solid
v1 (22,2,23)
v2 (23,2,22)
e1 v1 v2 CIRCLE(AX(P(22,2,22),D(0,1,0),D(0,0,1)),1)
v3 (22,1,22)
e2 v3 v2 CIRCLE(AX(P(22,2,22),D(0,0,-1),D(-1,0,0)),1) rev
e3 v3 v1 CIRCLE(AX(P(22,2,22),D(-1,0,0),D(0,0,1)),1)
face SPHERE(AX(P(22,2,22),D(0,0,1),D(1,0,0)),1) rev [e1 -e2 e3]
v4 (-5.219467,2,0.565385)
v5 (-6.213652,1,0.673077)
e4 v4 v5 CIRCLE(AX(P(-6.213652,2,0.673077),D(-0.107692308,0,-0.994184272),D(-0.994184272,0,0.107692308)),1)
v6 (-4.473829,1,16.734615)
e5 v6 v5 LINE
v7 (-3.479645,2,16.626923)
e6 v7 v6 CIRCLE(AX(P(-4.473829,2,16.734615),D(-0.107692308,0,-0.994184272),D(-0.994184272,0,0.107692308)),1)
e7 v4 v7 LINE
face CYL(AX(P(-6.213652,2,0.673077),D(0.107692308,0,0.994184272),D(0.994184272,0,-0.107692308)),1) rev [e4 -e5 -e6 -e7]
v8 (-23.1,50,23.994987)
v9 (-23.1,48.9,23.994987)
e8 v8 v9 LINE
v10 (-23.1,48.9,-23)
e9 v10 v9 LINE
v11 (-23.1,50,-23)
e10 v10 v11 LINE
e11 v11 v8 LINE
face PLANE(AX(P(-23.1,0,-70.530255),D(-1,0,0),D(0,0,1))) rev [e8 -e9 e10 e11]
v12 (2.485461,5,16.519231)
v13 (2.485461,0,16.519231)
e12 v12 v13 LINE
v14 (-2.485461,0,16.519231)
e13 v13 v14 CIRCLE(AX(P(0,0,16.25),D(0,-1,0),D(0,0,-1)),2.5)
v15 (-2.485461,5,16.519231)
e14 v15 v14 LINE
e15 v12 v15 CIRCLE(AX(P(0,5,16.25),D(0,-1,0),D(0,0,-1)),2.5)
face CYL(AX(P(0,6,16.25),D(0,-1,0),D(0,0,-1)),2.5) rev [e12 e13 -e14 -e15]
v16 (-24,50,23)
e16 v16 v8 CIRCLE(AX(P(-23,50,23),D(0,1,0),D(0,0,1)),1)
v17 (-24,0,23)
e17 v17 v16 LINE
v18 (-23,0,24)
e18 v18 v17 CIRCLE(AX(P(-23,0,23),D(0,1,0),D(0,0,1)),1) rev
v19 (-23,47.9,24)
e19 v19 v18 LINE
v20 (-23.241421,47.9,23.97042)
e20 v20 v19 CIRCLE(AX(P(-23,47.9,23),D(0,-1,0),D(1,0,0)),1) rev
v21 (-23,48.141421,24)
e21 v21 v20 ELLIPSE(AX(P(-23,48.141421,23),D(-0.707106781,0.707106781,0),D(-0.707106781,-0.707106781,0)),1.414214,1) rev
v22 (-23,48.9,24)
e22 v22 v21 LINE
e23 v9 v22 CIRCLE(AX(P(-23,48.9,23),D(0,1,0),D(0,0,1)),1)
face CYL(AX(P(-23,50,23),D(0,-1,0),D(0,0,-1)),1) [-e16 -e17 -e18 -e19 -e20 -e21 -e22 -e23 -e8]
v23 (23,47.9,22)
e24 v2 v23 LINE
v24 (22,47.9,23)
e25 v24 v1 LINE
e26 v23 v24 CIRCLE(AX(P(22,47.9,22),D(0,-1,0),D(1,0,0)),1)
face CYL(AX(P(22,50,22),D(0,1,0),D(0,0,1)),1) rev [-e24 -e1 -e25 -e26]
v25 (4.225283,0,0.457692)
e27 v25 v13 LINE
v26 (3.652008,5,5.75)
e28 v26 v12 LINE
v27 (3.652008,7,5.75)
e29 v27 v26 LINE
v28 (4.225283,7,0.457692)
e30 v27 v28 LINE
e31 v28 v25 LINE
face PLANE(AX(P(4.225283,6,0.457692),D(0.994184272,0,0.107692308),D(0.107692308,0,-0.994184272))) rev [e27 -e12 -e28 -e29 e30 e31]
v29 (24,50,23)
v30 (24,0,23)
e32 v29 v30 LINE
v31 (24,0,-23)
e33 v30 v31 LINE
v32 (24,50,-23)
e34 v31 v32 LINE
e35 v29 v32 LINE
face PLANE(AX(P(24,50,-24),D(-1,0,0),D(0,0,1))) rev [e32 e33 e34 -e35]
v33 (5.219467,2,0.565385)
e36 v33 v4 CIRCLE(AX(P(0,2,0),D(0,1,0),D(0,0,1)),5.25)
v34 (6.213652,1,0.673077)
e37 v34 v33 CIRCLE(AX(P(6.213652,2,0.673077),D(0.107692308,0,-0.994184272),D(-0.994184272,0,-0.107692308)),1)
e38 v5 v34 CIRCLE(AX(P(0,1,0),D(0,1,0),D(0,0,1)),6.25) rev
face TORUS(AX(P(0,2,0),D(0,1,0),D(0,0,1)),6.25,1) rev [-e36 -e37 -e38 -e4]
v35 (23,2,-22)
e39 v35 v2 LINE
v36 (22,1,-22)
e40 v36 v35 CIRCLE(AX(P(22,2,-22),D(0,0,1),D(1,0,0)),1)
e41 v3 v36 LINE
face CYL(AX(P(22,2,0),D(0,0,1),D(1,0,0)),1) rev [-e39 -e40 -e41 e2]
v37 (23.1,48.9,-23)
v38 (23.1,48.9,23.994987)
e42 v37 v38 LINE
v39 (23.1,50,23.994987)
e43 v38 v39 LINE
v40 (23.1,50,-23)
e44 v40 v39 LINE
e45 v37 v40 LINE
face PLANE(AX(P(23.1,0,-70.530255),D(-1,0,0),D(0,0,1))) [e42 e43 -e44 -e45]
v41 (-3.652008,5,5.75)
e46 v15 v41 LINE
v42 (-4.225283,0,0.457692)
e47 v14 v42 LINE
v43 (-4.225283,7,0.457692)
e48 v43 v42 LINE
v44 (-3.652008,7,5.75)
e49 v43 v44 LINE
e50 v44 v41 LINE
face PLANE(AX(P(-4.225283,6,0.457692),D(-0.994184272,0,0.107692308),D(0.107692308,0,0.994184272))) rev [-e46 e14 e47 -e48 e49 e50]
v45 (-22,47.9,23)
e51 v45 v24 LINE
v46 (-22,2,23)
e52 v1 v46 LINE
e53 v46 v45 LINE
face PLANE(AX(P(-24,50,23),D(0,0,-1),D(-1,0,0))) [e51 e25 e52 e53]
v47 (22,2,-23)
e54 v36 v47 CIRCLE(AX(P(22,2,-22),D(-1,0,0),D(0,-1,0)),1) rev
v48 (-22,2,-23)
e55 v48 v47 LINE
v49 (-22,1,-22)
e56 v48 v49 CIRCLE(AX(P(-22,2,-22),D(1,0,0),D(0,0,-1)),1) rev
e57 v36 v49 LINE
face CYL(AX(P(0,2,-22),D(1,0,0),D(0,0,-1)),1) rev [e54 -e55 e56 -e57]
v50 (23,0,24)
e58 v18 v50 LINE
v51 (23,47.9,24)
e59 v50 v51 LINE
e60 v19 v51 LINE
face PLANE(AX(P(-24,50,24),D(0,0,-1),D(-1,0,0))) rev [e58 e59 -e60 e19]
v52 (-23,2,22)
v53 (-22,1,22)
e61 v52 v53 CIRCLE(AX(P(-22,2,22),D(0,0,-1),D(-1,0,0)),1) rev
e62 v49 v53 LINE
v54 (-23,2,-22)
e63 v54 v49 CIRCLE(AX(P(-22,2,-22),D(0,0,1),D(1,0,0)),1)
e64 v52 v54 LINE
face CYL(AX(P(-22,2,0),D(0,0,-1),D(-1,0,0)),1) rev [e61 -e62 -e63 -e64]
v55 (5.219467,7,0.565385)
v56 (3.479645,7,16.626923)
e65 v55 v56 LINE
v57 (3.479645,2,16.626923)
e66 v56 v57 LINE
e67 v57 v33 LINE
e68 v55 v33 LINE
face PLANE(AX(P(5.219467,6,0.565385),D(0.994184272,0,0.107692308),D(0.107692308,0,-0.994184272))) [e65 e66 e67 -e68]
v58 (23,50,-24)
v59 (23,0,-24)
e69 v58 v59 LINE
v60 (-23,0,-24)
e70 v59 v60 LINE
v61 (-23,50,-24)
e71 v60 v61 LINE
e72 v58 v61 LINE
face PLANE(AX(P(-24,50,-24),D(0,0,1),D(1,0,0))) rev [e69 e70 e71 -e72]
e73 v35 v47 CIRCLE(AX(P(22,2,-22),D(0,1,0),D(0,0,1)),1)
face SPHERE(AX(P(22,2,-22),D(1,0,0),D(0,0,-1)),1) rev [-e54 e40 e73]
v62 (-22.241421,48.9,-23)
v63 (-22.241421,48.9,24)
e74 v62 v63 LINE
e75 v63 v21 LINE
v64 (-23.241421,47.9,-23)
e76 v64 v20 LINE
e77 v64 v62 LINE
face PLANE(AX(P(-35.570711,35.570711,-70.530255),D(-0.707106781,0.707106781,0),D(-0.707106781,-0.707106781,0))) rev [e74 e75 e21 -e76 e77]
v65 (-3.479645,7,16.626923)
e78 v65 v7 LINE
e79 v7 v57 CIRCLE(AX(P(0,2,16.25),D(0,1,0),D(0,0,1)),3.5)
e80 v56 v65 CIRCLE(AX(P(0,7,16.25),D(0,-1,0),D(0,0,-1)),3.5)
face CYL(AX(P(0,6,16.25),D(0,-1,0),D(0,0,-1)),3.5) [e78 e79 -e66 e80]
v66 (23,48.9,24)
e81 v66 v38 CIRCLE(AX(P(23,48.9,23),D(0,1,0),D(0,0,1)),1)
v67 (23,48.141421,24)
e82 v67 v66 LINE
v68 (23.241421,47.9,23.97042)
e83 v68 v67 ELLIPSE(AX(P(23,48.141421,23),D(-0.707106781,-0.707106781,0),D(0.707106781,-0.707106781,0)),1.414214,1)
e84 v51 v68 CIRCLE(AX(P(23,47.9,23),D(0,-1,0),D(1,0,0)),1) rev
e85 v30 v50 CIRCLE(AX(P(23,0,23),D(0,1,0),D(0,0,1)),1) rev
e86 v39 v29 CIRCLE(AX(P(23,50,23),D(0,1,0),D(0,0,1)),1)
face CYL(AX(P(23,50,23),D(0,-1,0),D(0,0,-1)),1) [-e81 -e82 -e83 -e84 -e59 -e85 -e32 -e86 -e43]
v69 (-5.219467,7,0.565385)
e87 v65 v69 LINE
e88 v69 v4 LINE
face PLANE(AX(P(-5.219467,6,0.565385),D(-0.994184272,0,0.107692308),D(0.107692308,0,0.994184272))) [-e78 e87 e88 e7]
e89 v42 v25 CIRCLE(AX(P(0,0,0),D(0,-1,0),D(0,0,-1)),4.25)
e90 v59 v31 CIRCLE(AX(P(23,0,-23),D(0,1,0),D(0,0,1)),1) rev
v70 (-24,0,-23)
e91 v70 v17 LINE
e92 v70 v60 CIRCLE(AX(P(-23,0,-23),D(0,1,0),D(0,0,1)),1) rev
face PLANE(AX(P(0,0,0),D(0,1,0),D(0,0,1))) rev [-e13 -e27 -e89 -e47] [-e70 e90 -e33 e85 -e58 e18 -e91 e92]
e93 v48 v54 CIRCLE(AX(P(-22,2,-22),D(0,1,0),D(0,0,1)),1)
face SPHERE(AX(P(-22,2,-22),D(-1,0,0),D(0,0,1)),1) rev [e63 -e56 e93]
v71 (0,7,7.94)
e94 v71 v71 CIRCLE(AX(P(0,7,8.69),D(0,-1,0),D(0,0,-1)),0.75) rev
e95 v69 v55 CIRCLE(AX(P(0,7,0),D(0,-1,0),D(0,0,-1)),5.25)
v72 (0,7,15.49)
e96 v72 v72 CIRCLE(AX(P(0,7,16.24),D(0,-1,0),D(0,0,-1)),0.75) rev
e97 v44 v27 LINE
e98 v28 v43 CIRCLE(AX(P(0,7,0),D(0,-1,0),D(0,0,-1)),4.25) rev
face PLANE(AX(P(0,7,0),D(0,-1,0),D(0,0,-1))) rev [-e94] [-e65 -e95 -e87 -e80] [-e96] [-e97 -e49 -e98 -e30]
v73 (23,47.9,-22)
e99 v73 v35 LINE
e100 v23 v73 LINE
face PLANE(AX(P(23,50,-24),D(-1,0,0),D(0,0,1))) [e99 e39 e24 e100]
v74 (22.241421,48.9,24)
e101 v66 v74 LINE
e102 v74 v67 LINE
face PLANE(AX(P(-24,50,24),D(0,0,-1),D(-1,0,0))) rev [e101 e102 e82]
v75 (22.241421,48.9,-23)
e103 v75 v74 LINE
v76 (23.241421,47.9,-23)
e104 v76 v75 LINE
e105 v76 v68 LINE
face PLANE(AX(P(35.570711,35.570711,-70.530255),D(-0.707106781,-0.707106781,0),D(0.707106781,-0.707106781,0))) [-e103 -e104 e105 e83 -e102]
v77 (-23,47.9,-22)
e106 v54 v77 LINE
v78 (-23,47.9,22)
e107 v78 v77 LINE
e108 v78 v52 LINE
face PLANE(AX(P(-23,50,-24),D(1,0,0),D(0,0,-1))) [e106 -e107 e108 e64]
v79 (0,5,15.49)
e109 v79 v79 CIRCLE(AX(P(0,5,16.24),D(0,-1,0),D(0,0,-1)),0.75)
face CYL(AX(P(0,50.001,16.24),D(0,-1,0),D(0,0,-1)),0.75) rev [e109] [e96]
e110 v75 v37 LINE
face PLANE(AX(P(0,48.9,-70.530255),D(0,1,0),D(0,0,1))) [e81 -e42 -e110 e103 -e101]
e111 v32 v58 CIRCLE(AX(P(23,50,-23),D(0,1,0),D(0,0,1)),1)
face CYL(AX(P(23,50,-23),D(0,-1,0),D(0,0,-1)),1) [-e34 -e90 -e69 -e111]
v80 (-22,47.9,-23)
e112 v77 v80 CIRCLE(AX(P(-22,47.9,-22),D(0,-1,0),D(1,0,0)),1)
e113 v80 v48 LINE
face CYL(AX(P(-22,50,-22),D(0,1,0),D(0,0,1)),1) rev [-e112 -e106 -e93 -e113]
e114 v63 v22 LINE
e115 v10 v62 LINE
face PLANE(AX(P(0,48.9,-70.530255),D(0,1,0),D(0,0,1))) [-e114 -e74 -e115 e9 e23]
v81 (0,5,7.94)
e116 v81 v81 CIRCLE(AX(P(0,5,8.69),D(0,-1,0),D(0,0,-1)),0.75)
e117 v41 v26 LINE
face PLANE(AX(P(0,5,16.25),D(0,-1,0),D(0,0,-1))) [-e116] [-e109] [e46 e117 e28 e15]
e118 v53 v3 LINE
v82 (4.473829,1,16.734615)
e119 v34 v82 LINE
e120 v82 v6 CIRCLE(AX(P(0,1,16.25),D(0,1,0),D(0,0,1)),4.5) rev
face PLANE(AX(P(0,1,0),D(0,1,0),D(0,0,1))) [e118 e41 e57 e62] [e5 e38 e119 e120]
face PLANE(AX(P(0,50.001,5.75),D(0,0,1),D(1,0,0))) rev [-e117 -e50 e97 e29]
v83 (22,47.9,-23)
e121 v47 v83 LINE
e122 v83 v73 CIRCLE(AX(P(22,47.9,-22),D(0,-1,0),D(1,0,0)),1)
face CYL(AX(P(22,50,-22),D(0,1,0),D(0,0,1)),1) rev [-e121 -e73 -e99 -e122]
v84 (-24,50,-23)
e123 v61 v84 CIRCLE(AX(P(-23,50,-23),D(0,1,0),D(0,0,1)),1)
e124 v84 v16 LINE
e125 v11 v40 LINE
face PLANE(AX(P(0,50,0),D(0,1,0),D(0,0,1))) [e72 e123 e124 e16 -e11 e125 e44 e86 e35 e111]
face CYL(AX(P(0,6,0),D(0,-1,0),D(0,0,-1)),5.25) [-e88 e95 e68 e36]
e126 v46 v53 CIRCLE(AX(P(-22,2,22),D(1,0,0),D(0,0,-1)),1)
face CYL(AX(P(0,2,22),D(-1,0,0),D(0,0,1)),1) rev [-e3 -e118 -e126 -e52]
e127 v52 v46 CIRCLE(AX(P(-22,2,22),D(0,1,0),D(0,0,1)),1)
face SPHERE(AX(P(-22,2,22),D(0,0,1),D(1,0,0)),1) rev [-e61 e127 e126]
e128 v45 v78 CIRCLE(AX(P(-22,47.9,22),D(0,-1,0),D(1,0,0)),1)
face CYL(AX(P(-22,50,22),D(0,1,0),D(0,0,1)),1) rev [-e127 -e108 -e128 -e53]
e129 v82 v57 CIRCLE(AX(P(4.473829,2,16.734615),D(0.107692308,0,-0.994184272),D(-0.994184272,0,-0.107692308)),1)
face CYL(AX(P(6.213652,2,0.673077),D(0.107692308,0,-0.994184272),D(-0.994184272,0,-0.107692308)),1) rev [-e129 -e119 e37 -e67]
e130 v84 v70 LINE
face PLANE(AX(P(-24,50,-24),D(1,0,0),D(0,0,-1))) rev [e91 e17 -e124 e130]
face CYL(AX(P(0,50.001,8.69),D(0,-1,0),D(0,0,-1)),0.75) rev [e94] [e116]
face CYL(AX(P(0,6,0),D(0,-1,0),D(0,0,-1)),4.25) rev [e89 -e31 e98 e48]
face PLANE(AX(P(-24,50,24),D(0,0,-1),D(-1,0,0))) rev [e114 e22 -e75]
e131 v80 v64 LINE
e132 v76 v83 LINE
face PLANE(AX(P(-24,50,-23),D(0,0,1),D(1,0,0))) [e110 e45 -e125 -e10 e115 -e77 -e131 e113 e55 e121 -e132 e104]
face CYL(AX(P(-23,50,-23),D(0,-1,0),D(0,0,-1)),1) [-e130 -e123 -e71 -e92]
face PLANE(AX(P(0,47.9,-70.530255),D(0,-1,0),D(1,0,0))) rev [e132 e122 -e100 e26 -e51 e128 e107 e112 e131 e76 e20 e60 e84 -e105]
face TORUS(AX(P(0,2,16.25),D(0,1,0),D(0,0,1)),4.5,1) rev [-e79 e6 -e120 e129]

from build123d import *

# Parameters (mm, degrees)
EXTRUDE_1_DEPTH     = 50
CUT_EXTRUDE_1_DEPTH = 47
CUT_EXTRUDE_3_DEPTH = 6
SHELL_START         = 1
SHELL_1_OUTLINE_W   = 46
SHELL_1_OUTLINE_H   = 46
SHELL_1_DEPTH       = 46.9
SHELL_START_2       = 7
SHELL_1_2_DEPTH     = 40.9
CUT_EXTRUDE_4_REACH = 57.57
FILLET_2_R          = 1
EXTRUDE_START       = 1
SKETCH_10_R         = 0.7500000000000009
EXTRUDE_3_DEPTH     = 1


# Read off the part's stored shape, not the designer's step: 抽壳1
with BuildPart() as part:
    # 草图1 → 凸台-拉伸1 (new body)
    with BuildSketch(Plane(origin=(0, 0, 0), x_dir=(1, 0, 0), z_dir=(0, 1, 0))):
        Polygon((-24.000000000000007, 24.000000000000004), (23.999999999999993, 24.000000000000004), (24.000000000000004, -24), (-23.999999999999996, -24), align=None)
    extrude(amount=EXTRUDE_1_DEPTH)

    # 草图2 → 切除-拉伸1 (cut)
    with BuildSketch(Plane.XY.offset(24)):
        Polygon((23.1, 50), (23.000000000000004, 50), (23.000000000000004, 49.00000000000004), (22.000000000000007, 49.00000000000005), (23.000000000000004, 48.000000000000036), (22.000000000000117, 47.99999999999991), (21.000000000000004, 49.00000000000004), (-20.99999999999999, 49.00000000000003), (-21.99999999999998, 48.00000000000006), (-22.999999999999975, 48.00000000000005), (-21.999999999999996, 49.000000000000036), (-22.999999999999996, 49.000000000000036), (-22.999999999999996, 50), (-23.09999999999999, 50), (-23.099999999999994, 48.900000000000034), (-22.241421356237293, 48.900000000000034), (-23.24142135623728, 47.900000000000055), (-21.958578643762664, 47.90000000000006), (-20.95857864376269, 48.900000000000034), (20.9585786437627, 48.90000000000004), (21.95857864376282, 47.8999999999999), (23.241421356237286, 47.90000000000006), (22.24142135623732, 48.90000000000004), (23.1, 48.90000000000004), align=None)
        Polygon((23.000000000000004, 49.00000000000004), (23.000000000000004, 50), (-22.999999999999996, 50), (-22.999999999999996, 49.000000000000036), (-21.999999999999996, 49.000000000000036), (-22.999999999999975, 48.00000000000005), (-21.99999999999998, 48.00000000000006), (-20.99999999999999, 49.00000000000003), (21.000000000000004, 49.00000000000004), (22.000000000000117, 47.99999999999991), (23.000000000000004, 48.000000000000036), (22.000000000000007, 49.00000000000005), align=None)
        Polygon((-20.95857864376269, 48.900000000000034), (-21.958578643762664, 47.90000000000006), (21.95857864376282, 47.8999999999999), (20.9585786437627, 48.90000000000004), align=None)
    extrude(amount=-CUT_EXTRUDE_1_DEPTH, mode=Mode.SUBTRACT)

    # 草图6 → 切除-拉伸3 (cut)
    with BuildSketch(Plane.XZ):
        with BuildLine():
            Line((4.225283156367072, 0.45769230769231345), (2.485460680215815, 16.519230769230756))
            ThreePointArc((2.485460680215815, 16.519230769230756), (-1.2012e-13, 18.75), (-2.485460680216046, 16.51923076923075))
            Line((-2.485460680216046, 16.51923076923075), (-4.225283156367078, 0.4576923076922684))
            ThreePointArc((-4.225283156367078, 0.4576923076922684), (2.187e-14, -4.250000000000001), (4.225283156367072, 0.45769230769231345))
        make_face()
    extrude(amount=-CUT_EXTRUDE_3_DEPTH, mode=Mode.SUBTRACT)

    # 抽壳1 outline → 抽壳1 (cut)
    with BuildSketch(Plane(origin=(0, 0, 0), x_dir=(1, 0, 0), z_dir=(0, 1, 0)).offset(SHELL_START)):
        Rectangle(SHELL_1_OUTLINE_W, SHELL_1_OUTLINE_H)
        with BuildLine():
            Line((-3.479644952, -16.626923077), (-5.219467428, -0.565384615))
            ThreePointArc((-5.219467428, -0.565384615), (0, 5.25), (5.219467428, -0.565384615))
            Line((5.219467428, -0.565384615), (3.479644952, -16.626923077))
            ThreePointArc((3.479644952, -16.626923077), (0, -19.75), (-3.479644952, -16.626923077))
        make_face(mode=Mode.SUBTRACT)
    extrude(amount=SHELL_1_DEPTH, mode=Mode.SUBTRACT)

    # Shell 1 2 outline → Shell 1 2 (cut)
    with BuildSketch(Plane(origin=(0, 0, 0), x_dir=(1, 0, 0), z_dir=(0, 1, 0)).offset(SHELL_START_2)):
        with BuildLine():
            ThreePointArc((5.219467428, -0.565384615), (0, 5.25), (-5.219467428, -0.565384615))
            Line((-5.219467428, -0.565384615), (-3.479644952, -16.626923077))
            ThreePointArc((-3.479644952, -16.626923077), (0, -19.75), (3.479644952, -16.626923077))
            Line((3.479644952, -16.626923077), (5.219467428, -0.565384615))
        make_face()
    extrude(amount=SHELL_1_2_DEPTH, mode=Mode.SUBTRACT)

    # 草图7 → 切除-拉伸4 (cut, up to next)
    with BuildSketch(Plane.XZ.offset(-6), mode=Mode.PRIVATE) as cut_extrude_4_sk1:
        with BuildLine():
            ThreePointArc((1.0553e-13, -4.25), (3.1628857320248525, -2.8387768221812744), (4.225283156367072, 0.45769230769231267))
            Line((4.225283156367072, 0.45769230769231345), (3.6520083174819797, 5.75000000000003))
            Line((3.6520083174819793, 5.750000000000031), (-3.997e-14, 5.750000000000005))
            Line((-4.015e-14, 5.750000000000007), (2.968e-14, -4.25))
        make_face()
    cut_extrude_4_tool1 = extrude(cut_extrude_4_sk1.sketch, amount=-CUT_EXTRUDE_4_REACH, mode=Mode.PRIVATE) & part.part
    # 草图7 → 切除-拉伸4 (cut, up to next)
    with BuildSketch(Plane.XZ.offset(-6), mode=Mode.PRIVATE) as cut_extrude_4_sk2:
        with BuildLine():
            ThreePointArc((-4.225283156367077, 0.4576923076922684), (-3.162885732024767, -2.8387768221813694), (1.0553e-13, -4.25))
            Line((2.968e-14, -4.25), (-4.015e-14, 5.750000000000007))
            Line((-3.997e-14, 5.750000000000005), (-3.6520083174820606, 5.74999999999998))
            Line((-3.6520083174820623, 5.7499999999999805), (-4.225283156367078, 0.45769230769226965))
        make_face()
    cut_extrude_4_tool2 = extrude(cut_extrude_4_sk2.sketch, amount=-CUT_EXTRUDE_4_REACH, mode=Mode.PRIVATE) & part.part
    # 草图7 → 切除-拉伸4 (cut, up to next)
    with BuildSketch(Plane.XZ.offset(-6), mode=Mode.PRIVATE) as cut_extrude_4_sk3:
        with BuildLine():
            ThreePointArc((-7.866e-14, 9.439999999999992), (-0.7500000000000644, 8.689999999999989), (-7.185e-14, 7.9399999999999915))
            Line((-5.544e-14, 7.939999999999991), (-6.592e-14, 9.43999999999999))
        make_face()
    cut_extrude_4_tool3 = extrude(cut_extrude_4_sk3.sketch, amount=-CUT_EXTRUDE_4_REACH, mode=Mode.PRIVATE) & part.part
    # 草图7 → 切除-拉伸4 (cut, up to next)
    with BuildSketch(Plane.XZ.offset(-6), mode=Mode.PRIVATE) as cut_extrude_4_sk4:
        with BuildLine():
            Line((-6.592e-14, 9.43999999999999), (-5.544e-14, 7.939999999999991))
            ThreePointArc((-7.185e-14, 7.9399999999999915), (0.5303300858898444, 8.15966991411008), (0.7499999999999369, 8.689999999999992))
            ThreePointArc((0.7499999999999369, 8.689999999999992), (0.5303300858898421, 9.220330085889909), (-7.866e-14, 9.439999999999992))
        make_face()
    cut_extrude_4_tool4 = extrude(cut_extrude_4_sk4.sketch, amount=-CUT_EXTRUDE_4_REACH, mode=Mode.PRIVATE) & part.part
    # 草图7 → 切除-拉伸4 (cut, up to next)
    with BuildSketch(Plane.XZ.offset(-6), mode=Mode.PRIVATE) as cut_extrude_4_sk5:
        with BuildLine():
            ThreePointArc((-7.866e-14, 9.439999999999992), (-0.7500000000000644, 8.689999999999989), (-7.185e-14, 7.9399999999999915))
            Line((-5.544e-14, 7.939999999999991), (-6.592e-14, 9.43999999999999))
        make_face()
    cut_extrude_4_tool5 = extrude(cut_extrude_4_sk5.sketch, amount=-CUT_EXTRUDE_4_REACH, mode=Mode.PRIVATE) & part.part
    # 草图7 → 切除-拉伸4 (cut, up to next)
    with BuildSketch(Plane.XZ.offset(-6), mode=Mode.PRIVATE) as cut_extrude_4_sk6:
        with BuildLine():
            Line((-6.592e-14, 9.43999999999999), (-5.544e-14, 7.939999999999991))
            ThreePointArc((-7.185e-14, 7.9399999999999915), (0.5303300858898444, 8.15966991411008), (0.7499999999999369, 8.689999999999992))
            ThreePointArc((0.7499999999999369, 8.689999999999992), (0.5303300858898421, 9.220330085889909), (-7.866e-14, 9.439999999999992))
        make_face()
    cut_extrude_4_tool6 = extrude(cut_extrude_4_sk6.sketch, amount=-CUT_EXTRUDE_4_REACH, mode=Mode.PRIVATE) & part.part
    # 草图7 → 切除-拉伸4 (cut, up to next)
    with BuildSketch(Plane.XZ.offset(-6), mode=Mode.PRIVATE) as cut_extrude_4_sk7:
        with BuildLine():
            ThreePointArc((0.7499999999998826, 16.24), (0.5303300858897884, 16.770330085889913), (-1.3142e-13, 16.99))
            Line((-1.1864e-13, 16.989999999999995), (-1.0817e-13, 15.489999999999998))
            ThreePointArc((-1.2411e-13, 15.489999999999998), (0.5303300858897908, 15.709669914110085), (0.7499999999998826, 16.24))
        make_face()
    cut_extrude_4_tool7 = extrude(cut_extrude_4_sk7.sketch, amount=-CUT_EXTRUDE_4_REACH, mode=Mode.PRIVATE) & part.part
    # 草图7 → 切除-拉伸4 (cut, up to next)
    with BuildSketch(Plane.XZ.offset(-6), mode=Mode.PRIVATE) as cut_extrude_4_sk8:
        with BuildLine():
            Line((-1.0817e-13, 15.489999999999998), (-1.1864e-13, 16.989999999999995))
            ThreePointArc((-1.3142e-13, 16.99), (-0.7500000000001174, 16.239999999999995), (-1.2344e-13, 15.489999999999998))
        make_face()
    cut_extrude_4_tool8 = extrude(cut_extrude_4_sk8.sketch, amount=-CUT_EXTRUDE_4_REACH, mode=Mode.PRIVATE) & part.part
    # 草图7 → 切除-拉伸4 (cut, up to next)
    with BuildSketch(Plane.XZ.offset(-6), mode=Mode.PRIVATE) as cut_extrude_4_sk9:
        with BuildLine():
            ThreePointArc((0.7499999999998826, 16.24), (0.5303300858897884, 16.770330085889913), (-1.3142e-13, 16.99))
            Line((-1.1864e-13, 16.989999999999995), (-1.0817e-13, 15.489999999999998))
            ThreePointArc((-1.2411e-13, 15.489999999999998), (0.5303300858897908, 15.709669914110085), (0.7499999999998826, 16.24))
        make_face()
    cut_extrude_4_tool9 = extrude(cut_extrude_4_sk9.sketch, amount=-CUT_EXTRUDE_4_REACH, mode=Mode.PRIVATE) & part.part
    # 草图7 → 切除-拉伸4 (cut, up to next)
    with BuildSketch(Plane.XZ.offset(-6), mode=Mode.PRIVATE) as cut_extrude_4_sk10:
        with BuildLine():
            Line((-1.0817e-13, 15.489999999999998), (-1.1864e-13, 16.989999999999995))
            ThreePointArc((-1.3142e-13, 16.99), (-0.7500000000001174, 16.239999999999995), (-1.2344e-13, 15.489999999999998))
        make_face()
    cut_extrude_4_tool10 = extrude(cut_extrude_4_sk10.sketch, amount=-CUT_EXTRUDE_4_REACH, mode=Mode.PRIVATE) & part.part
    add(cut_extrude_4_tool1.solids().sort_by_distance((1.915714, 6, 1.033627))[0], mode=Mode.SUBTRACT)
    add(cut_extrude_4_tool2.solids().sort_by_distance((-1.915714, 6, 1.033627))[0], mode=Mode.SUBTRACT)
    add(cut_extrude_4_tool3.solids().sort_by_distance((-0.31831, 6, 8.69))[0], mode=Mode.SUBTRACT)
    add(cut_extrude_4_tool4.solids().sort_by_distance((0.31831, 6, 8.69))[0], mode=Mode.SUBTRACT)
    add(cut_extrude_4_tool5.solids().sort_by_distance((-0.31831, 6, 8.69))[0], mode=Mode.SUBTRACT)
    add(cut_extrude_4_tool6.solids().sort_by_distance((0.31831, 6, 8.69))[0], mode=Mode.SUBTRACT)
    add(cut_extrude_4_tool7.solids().sort_by_distance((0.31831, 6, 16.24))[0], mode=Mode.SUBTRACT)
    add(cut_extrude_4_tool8.solids().sort_by_distance((-0.31831, 6, 16.24))[0], mode=Mode.SUBTRACT)
    add(cut_extrude_4_tool9.solids().sort_by_distance((0.31831, 6, 16.24))[0], mode=Mode.SUBTRACT)
    add(cut_extrude_4_tool10.solids().sort_by_distance((-0.31831, 6, 16.24))[0], mode=Mode.SUBTRACT)

    # 圆角2
    # the kernel refuses this fillet: 1 mm, written as the material it adds along each edge
    with BuildSketch(Plane(origin=(22, 2, -22), x_dir=(0, -1, 0), z_dir=(1, 0, 0))) as fillet_2_piece_1_section:
        Polygon((0, 0), (FILLET_2_R, 0), (FILLET_2_R, FILLET_2_R), (0, FILLET_2_R), align=None)
    fillet_2_piece_1 = extrude(amount=FILLET_2_R, mode=Mode.PRIVATE)
    fillet_2_piece_1 = fillet_2_piece_1 - Plane(origin=(22, 2, -22), x_dir=(0, 0.7071067811865475, 0.7071067811865475), z_dir=(1, 0, 0)) * Sphere(FILLET_2_R, mode=Mode.PRIVATE)
    add(fillet_2_piece_1)
    with BuildSketch(Plane(origin=(-22, 2, -22), x_dir=(0, -1, 0), z_dir=(-1, 0, 0))) as fillet_2_piece_2_section:
        Polygon((0, 0), (FILLET_2_R, 0), (FILLET_2_R, -FILLET_2_R), (0, -FILLET_2_R), align=None)
    fillet_2_piece_2 = extrude(amount=FILLET_2_R, mode=Mode.PRIVATE)
    fillet_2_piece_2 = fillet_2_piece_2 - Plane(origin=(-22, 2, -22), x_dir=(0, 0.7071067811865475, 0.7071067811865475), z_dir=(-1, 0, 0)) * Sphere(FILLET_2_R, mode=Mode.PRIVATE)
    add(fillet_2_piece_2)
    with BuildSketch(Plane(origin=(22, 2, 22), x_dir=(0, -1, 0), z_dir=(1, 0, 0))) as fillet_2_piece_3_section:
        Polygon((0, 0), (FILLET_2_R, 0), (FILLET_2_R, -FILLET_2_R), (0, -FILLET_2_R), align=None)
    fillet_2_piece_3 = extrude(amount=FILLET_2_R, mode=Mode.PRIVATE)
    fillet_2_piece_3 = fillet_2_piece_3 - Plane(origin=(22, 2, 22), x_dir=(0, 0.7071067811865475, -0.7071067811865475), z_dir=(1, 0, 0)) * Sphere(FILLET_2_R, mode=Mode.PRIVATE)
    add(fillet_2_piece_3)
    with BuildSketch(Plane(origin=(-22, 2, 22), x_dir=(0, -1, 0), z_dir=(-1, 0, 0))) as fillet_2_piece_4_section:
        Polygon((0, 0), (FILLET_2_R, 0), (FILLET_2_R, FILLET_2_R), (0, FILLET_2_R), align=None)
    fillet_2_piece_4 = extrude(amount=FILLET_2_R, mode=Mode.PRIVATE)
    fillet_2_piece_4 = fillet_2_piece_4 - Plane(origin=(-22, 2, 22), x_dir=(0, 0.7071067811865475, -0.7071067811865475), z_dir=(-1, 0, 0)) * Sphere(FILLET_2_R, mode=Mode.PRIVATE)
    add(fillet_2_piece_4)
    with BuildSketch(Plane(origin=(-1.1e-16, 1, 16.250000000327525), x_dir=(0.9941842720930342, 0, 0.1076923076307851), z_dir=(0.1076923076307851, 0, -0.9941842720930342))) as fillet_2_piece_5:
        with BuildLine():
            CenterArc((3.4999999996724753 + FILLET_2_R, -FILLET_2_R), FILLET_2_R, 90, 90)
            Line((3.4999999996724753, -FILLET_2_R), (3.4999999996724753, 0))
            Line((3.4999999996724753, 0), (3.4999999996724753 + FILLET_2_R, 0))
        make_face()
    revolve(axis=Axis((-1.1e-16, 1, 16.250000000327525), (0, -1, 0)), revolution_arc=167.63539153430426)
    with BuildSketch(Plane(origin=(5.219467428, 1, 0.565384615), x_dir=(0.994184272087703, 0, 0.10769230768000165), z_dir=(-0.10769230768000165, 0, 0.994184272087703))) as fillet_2_piece_6:
        with BuildLine():
            CenterArc((FILLET_2_R, FILLET_2_R), FILLET_2_R, 180, 90)
            Line((0, FILLET_2_R), (0, 0))
            Line((0, 0), (FILLET_2_R, 0))
        make_face()
    extrude(amount=16.15549442184609)
    with BuildSketch(Plane(origin=(0, 1.0, -4.4436987423068786e-10), x_dir=(-0.9941842720841496, 0, 0.10769230771280479), z_dir=(0.10769230771280479, 0, 0.9941842720841496))) as fillet_2_piece_7:
        with BuildLine():
            CenterArc((5.24999999955563 + FILLET_2_R, -FILLET_2_R), FILLET_2_R, 90, 90)
            Line((5.24999999955563, -FILLET_2_R), (5.24999999955563, 0))
            Line((5.24999999955563, 0), (5.24999999955563 + FILLET_2_R, 0))
        make_face()
    revolve(axis=Axis((0, 1.0, -4.4436987423068786e-10), (0, -1, 0)), revolution_arc=192.36460847514948)
    with BuildSketch(Plane(origin=(-3.479644952, 1, 16.626923077), x_dir=(-0.9941842720877031, 0, 0.10769230768000167), z_dir=(-0.10769230768000165, 0, -0.994184272087703))) as fillet_2_piece_8:
        with BuildLine():
            CenterArc((FILLET_2_R, FILLET_2_R), FILLET_2_R, 180, 90)
            Line((0, FILLET_2_R), (0, 0))
            Line((0, 0), (FILLET_2_R, 0))
        make_face()
    extrude(amount=16.15549442184609)
    with BuildSketch(Plane(origin=(22, 1, -23), x_dir=(0, 0, 1), z_dir=(-1, 0, 0)), Plane(origin=(23, 1, 22), x_dir=(-1, 0, 0), z_dir=(0, 0, -1)), Plane(origin=(-22, 1, 23), x_dir=(0, 0, -1), z_dir=(1, 0, 0))) as fillet_2_piece_9:
        with BuildLine():
            CenterArc((FILLET_2_R, FILLET_2_R), FILLET_2_R, 180, 90)
            Line((0, FILLET_2_R), (0, 0))
            Line((0, 0), (FILLET_2_R, 0))
        make_face()
    extrude(amount=44)
    with BuildSketch(Plane(origin=(-23, 1.9999999999999998, -23), x_dir=(0, 0, 1), z_dir=(0, 1, 0))) as fillet_2_piece_10:
        with BuildLine():
            CenterArc((FILLET_2_R, FILLET_2_R), FILLET_2_R, 180, 90)
            Line((0, FILLET_2_R), (0, 0))
            Line((0, 0), (FILLET_2_R, 0))
        make_face()
    extrude(amount=45.9)
    with BuildSketch(Plane(origin=(23, 1.9999999999999998, -23), x_dir=(0, 0, 1), z_dir=(0, 1, 0)), Plane(origin=(23, 1.9999999999999998, 23), x_dir=(-1, 0, 0), z_dir=(0, 1, 0)), Plane(origin=(-23, 1.9999999999999998, 23), x_dir=(0, 0, -1), z_dir=(0, 1, 0))) as fillet_2_piece_11:
        with BuildLine():
            CenterArc((FILLET_2_R, -FILLET_2_R), FILLET_2_R, 90, 90)
            Line((0, -FILLET_2_R), (0, 0))
            Line((0, 0), (FILLET_2_R, 0))
        make_face()
    extrude(amount=45.9)
    with BuildSketch(Plane(origin=(-23, 1, -22), x_dir=(0, 1, 0), z_dir=(0, 0, 1))) as fillet_2_piece_12:
        with BuildLine():
            CenterArc((FILLET_2_R, -FILLET_2_R), FILLET_2_R, 90, 90)
            Line((0, -FILLET_2_R), (0, 0))
            Line((0, 0), (FILLET_2_R, 0))
        make_face()
    extrude(amount=44)
    # the kernel refuses this fillet: 1 mm, written as the material it takes off along each edge
    with BuildSketch(Plane(origin=(23.999999999999993, -2.5, -24.000000000000004), x_dir=(-1, 0, 0), z_dir=(0, 1, 0)), Plane(origin=(-23.999999999999996, -2.5, 24), x_dir=(1, 0, 0), z_dir=(0, 1, 0))) as fillet_2_2_piece_1:
        with BuildLine():
            CenterArc((FILLET_2_R, FILLET_2_R), FILLET_2_R, 180, 90)
            Line((0, FILLET_2_R), (0, 0))
            Line((0, 0), (FILLET_2_R, 0))
        make_face()
    extrude(amount=55, mode=Mode.SUBTRACT)
    with BuildSketch(Plane(origin=(24.000000000000004, -2.5, 24), x_dir=(-1, 0, 0), z_dir=(0, 1, 0)), Plane(origin=(-24.000000000000007, -2.5, -24.000000000000004), x_dir=(1, 0, 0), z_dir=(0, 1, 0))) as fillet_2_2_piece_2:
        with BuildLine():
            CenterArc((FILLET_2_R, -FILLET_2_R), FILLET_2_R, 90, 89.9999999999998)
            Line((0, -FILLET_2_R), (0, 0))
            Line((0, 0), (FILLET_2_R, 0))
        make_face()
    extrude(amount=55, mode=Mode.SUBTRACT)

    # 草图10 → 凸台-拉伸3 (add)
    with BuildSketch(Plane.XZ.offset(-6).offset(EXTRUDE_START)):
        with BuildLine():
            Line((-3.6520083174820623, 5.74999999999998), (3.6520083174819797, 5.75000000000003))
            Line((3.6520083174819797, 5.75000000000003), (2.4854606802158132, 16.519230769230756))
            ThreePointArc((2.4854606802158132, 16.519230769230756), (-1.2012e-13, 18.749999999999996), (-2.485460680216047, 16.51923076923075))
            Line((-2.485460680216047, 16.51923076923075), (-3.6520083174820623, 5.74999999999998))
        make_face()
        with Locations(Location((-6.372e-14, 8.689999999999992, 0), (0, 0, 270))):
            Circle(SKETCH_10_R, mode=Mode.SUBTRACT)
        with Locations(Location((-1.1731e-13, 16.24, 0), (0, 0, 270))):
            Circle(SKETCH_10_R, mode=Mode.SUBTRACT)
    extrude(amount=-EXTRUDE_3_DEPTH)


solid = part.part
